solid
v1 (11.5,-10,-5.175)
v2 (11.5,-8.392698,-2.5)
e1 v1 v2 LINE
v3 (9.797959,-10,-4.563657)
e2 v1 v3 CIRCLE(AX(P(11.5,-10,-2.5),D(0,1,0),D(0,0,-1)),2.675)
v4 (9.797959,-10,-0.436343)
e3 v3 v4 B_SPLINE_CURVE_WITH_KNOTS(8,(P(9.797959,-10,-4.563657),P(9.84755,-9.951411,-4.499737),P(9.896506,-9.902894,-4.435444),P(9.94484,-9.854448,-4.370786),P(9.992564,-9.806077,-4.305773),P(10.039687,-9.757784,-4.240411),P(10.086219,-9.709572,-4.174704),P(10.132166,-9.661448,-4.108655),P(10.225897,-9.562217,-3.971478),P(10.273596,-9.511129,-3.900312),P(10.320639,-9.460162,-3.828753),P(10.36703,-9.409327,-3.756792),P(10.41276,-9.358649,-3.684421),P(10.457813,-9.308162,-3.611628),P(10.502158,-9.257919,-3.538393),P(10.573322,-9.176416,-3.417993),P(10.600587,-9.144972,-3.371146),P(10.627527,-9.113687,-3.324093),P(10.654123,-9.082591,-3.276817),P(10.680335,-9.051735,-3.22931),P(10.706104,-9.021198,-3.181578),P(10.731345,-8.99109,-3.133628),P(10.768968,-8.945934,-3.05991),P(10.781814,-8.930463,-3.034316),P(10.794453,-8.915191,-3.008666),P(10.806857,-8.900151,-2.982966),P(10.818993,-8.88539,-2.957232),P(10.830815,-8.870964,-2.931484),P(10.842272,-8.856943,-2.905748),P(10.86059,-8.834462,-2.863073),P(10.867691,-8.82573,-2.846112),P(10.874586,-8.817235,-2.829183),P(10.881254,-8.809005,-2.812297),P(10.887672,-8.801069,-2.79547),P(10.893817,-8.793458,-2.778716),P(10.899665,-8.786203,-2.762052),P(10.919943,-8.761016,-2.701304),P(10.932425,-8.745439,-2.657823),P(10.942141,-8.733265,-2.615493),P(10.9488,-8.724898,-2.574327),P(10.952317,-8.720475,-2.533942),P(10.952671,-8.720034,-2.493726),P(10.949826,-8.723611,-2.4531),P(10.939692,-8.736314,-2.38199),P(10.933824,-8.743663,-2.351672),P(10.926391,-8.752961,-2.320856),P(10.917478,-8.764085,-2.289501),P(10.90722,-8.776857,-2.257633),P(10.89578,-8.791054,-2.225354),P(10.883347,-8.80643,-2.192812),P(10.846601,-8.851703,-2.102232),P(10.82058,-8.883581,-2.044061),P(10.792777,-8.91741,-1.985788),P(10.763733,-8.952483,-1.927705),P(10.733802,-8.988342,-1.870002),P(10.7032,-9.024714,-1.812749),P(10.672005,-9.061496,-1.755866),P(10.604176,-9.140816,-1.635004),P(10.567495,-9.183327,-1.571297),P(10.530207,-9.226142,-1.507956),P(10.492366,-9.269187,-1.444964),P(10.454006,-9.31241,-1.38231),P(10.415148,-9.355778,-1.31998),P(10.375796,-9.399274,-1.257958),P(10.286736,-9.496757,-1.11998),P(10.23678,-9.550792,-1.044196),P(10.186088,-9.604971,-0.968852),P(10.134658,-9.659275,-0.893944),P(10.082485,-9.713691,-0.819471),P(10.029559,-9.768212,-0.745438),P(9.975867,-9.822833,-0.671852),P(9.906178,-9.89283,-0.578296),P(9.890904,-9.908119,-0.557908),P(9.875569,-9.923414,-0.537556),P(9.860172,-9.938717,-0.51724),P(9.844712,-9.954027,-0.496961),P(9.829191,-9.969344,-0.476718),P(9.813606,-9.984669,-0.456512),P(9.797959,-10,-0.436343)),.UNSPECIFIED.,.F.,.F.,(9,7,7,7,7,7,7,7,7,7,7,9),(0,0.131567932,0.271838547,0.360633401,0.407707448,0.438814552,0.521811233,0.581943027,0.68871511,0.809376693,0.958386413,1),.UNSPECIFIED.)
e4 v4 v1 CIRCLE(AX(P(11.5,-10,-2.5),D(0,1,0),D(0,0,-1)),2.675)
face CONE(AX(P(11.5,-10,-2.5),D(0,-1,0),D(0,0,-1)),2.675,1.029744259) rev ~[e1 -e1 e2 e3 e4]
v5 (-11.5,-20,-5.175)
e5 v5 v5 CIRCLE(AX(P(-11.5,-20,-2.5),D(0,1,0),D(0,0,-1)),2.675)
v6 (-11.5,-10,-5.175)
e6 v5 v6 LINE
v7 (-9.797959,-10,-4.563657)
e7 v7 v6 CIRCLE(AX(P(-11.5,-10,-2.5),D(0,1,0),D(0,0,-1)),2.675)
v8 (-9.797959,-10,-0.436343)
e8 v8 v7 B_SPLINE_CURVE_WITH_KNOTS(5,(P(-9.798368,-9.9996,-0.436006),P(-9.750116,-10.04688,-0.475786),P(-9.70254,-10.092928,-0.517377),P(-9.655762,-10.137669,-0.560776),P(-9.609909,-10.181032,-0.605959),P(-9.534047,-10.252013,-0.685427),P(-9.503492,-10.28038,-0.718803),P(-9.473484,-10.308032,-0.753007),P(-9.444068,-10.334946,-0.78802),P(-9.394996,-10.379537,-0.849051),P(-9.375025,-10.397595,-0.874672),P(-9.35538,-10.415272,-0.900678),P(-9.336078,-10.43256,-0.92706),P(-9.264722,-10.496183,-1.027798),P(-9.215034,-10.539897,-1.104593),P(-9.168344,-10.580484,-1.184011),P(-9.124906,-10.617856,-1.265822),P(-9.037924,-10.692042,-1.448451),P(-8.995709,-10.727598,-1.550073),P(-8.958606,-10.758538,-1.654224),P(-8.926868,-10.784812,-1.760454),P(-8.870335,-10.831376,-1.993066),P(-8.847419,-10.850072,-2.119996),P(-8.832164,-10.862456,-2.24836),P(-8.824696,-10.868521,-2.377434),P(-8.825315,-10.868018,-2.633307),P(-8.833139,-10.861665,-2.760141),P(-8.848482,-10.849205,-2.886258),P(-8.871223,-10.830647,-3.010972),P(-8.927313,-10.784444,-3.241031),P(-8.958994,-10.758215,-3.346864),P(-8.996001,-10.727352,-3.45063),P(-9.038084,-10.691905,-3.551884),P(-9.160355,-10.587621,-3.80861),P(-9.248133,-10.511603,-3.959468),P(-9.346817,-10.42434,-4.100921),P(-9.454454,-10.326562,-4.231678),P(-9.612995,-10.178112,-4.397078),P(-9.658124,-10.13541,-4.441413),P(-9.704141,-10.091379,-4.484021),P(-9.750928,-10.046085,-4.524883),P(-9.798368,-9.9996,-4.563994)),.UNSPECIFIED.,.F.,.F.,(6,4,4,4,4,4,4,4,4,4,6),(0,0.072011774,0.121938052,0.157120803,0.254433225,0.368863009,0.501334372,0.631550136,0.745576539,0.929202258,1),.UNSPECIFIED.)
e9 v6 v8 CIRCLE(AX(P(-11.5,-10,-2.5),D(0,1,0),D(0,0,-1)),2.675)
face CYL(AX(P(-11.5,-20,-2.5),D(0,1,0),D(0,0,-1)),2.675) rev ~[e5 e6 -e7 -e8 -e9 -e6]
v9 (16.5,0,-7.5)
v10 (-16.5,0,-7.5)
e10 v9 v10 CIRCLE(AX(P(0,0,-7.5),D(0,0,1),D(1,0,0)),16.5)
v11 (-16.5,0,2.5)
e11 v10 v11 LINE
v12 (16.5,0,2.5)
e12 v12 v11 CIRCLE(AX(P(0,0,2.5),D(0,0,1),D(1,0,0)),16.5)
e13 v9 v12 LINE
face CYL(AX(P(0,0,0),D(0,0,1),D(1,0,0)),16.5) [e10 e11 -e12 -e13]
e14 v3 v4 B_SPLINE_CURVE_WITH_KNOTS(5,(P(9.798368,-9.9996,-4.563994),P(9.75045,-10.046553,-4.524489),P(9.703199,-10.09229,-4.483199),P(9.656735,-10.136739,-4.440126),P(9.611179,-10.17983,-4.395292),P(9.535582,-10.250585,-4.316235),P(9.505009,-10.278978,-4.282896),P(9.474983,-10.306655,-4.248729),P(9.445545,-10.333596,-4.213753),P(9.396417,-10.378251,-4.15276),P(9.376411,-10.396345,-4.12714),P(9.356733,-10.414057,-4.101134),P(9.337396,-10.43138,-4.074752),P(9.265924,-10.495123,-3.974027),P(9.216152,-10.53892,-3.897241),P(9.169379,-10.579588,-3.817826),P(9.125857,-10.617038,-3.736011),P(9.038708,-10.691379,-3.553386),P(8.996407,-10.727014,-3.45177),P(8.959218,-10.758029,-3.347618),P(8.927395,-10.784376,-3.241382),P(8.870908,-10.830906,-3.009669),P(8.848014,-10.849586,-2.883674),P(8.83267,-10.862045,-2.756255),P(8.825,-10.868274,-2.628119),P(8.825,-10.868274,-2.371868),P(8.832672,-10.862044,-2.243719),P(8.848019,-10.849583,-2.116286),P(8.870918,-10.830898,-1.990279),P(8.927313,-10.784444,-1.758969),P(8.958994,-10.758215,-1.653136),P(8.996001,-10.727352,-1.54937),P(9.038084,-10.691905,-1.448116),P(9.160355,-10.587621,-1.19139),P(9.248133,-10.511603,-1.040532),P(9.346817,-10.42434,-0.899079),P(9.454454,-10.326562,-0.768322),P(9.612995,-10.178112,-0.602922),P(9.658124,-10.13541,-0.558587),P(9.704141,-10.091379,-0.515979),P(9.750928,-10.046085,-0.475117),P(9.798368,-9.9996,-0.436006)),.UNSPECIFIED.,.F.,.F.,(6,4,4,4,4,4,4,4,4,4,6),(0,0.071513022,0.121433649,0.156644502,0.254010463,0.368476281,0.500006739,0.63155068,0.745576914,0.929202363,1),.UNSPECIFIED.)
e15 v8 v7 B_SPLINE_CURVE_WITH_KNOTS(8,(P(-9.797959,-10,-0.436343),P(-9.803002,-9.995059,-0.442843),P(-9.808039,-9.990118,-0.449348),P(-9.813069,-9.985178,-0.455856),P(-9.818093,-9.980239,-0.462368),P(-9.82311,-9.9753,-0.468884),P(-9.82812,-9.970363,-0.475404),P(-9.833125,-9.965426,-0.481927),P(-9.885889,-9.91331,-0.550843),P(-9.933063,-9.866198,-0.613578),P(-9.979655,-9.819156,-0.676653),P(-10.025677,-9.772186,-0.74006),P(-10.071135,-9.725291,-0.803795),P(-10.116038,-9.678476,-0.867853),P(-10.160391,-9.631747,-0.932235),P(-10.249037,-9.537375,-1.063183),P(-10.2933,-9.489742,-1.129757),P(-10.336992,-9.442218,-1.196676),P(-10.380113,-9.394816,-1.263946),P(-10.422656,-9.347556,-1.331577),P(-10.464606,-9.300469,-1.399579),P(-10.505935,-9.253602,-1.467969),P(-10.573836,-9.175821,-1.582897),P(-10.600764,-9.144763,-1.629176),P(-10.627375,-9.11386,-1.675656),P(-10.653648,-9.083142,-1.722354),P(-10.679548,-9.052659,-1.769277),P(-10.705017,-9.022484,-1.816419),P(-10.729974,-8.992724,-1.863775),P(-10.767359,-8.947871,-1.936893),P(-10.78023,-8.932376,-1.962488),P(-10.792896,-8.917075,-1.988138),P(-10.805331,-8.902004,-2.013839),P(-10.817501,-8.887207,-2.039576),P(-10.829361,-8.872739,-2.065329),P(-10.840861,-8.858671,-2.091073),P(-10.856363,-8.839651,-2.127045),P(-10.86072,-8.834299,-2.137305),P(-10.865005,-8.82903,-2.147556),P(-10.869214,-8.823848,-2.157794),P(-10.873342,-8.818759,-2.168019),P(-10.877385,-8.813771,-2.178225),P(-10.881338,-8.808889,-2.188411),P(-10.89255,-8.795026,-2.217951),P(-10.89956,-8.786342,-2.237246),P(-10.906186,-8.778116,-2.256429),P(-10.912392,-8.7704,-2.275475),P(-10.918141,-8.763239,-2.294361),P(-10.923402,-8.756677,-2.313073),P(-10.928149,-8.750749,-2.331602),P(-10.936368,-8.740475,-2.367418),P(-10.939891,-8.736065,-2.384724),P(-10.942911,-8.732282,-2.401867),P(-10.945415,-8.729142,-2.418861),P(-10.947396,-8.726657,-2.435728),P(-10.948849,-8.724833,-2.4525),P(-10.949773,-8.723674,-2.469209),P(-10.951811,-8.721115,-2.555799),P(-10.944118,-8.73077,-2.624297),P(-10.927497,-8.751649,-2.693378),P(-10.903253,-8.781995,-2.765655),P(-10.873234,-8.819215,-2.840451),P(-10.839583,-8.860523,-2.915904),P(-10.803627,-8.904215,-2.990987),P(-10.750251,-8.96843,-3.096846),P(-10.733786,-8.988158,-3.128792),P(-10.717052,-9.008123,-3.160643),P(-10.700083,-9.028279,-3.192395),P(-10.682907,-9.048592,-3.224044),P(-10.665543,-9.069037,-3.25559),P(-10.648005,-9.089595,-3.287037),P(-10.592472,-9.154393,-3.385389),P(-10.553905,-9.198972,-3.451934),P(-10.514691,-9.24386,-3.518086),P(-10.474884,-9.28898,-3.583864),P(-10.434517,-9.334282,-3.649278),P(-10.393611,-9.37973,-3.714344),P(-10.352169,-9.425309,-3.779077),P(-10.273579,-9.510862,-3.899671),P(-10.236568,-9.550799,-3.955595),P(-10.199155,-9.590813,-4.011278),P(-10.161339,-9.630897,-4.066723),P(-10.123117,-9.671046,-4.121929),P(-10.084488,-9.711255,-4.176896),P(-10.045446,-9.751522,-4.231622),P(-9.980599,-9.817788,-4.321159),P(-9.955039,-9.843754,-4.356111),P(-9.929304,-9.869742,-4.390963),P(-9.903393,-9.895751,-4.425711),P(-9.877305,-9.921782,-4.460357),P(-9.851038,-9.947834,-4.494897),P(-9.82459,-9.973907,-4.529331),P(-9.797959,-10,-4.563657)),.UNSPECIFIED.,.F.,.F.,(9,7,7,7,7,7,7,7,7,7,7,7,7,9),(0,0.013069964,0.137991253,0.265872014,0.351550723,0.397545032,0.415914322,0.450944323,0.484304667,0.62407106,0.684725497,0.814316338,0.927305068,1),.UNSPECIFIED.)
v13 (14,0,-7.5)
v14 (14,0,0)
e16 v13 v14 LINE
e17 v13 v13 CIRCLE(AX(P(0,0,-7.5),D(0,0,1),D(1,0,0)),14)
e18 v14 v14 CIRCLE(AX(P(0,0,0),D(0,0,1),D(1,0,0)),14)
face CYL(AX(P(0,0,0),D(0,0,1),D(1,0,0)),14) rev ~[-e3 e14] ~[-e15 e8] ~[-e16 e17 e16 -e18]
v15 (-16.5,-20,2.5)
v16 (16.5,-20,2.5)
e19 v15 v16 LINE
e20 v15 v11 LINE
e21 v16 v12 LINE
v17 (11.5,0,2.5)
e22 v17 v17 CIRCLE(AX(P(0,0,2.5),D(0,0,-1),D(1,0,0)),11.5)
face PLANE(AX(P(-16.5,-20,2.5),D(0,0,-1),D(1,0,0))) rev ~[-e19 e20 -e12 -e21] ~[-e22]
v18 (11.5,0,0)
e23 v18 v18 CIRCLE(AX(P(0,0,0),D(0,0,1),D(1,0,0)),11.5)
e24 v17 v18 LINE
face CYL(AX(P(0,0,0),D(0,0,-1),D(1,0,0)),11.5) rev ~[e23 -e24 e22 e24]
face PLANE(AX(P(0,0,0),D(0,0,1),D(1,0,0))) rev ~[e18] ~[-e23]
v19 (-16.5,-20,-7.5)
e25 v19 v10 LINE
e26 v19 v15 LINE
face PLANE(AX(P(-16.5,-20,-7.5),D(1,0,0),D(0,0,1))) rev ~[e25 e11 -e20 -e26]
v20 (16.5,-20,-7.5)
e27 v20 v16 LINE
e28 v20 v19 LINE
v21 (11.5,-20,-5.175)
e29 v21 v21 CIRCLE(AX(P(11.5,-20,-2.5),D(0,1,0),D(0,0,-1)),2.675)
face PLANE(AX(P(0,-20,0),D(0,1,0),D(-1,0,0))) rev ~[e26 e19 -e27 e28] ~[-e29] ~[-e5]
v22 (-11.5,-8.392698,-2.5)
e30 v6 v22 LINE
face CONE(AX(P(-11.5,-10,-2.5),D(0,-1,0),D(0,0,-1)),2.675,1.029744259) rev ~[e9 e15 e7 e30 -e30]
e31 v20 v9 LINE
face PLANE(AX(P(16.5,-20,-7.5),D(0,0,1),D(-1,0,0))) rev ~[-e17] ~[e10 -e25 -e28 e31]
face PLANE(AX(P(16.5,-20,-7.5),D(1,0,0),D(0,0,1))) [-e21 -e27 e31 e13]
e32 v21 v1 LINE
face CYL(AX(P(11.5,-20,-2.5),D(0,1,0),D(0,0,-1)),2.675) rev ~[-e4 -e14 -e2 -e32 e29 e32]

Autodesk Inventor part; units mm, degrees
ref_plane "YZ Plane" through (0, 0, 0) normal (1, 0, 0) x (0, 1, 0)
ref_plane "XY Plane" through (0, 0, 0) normal (0, 0, 1) x (1, 0, 0)
sketch "Sketch1" plane through (0, 0, 0) normal (0, 0, 1) x (1, 0, 0)
  circle A0 centre (0, 0) radius 14
  circle A1 centre (0, 0) radius 16.5
  circle A2 centre (0, 0) radius 11.5
  dimension "d0" = 28
  dimension "d1" = 33
  dimension "d2" = 23
extrude "Extrusion1" add sketch "Sketch1" along normal blind 2.5 contours A0 | A1
extrude "Extrusion2" add sketch "Sketch1" against normal blind 7.5 contours A1
ref_plane "Work Plane1" through (0, -20, 0) normal (0, 1, 0) x (-1, 0, 0)
sketch "Sketch2" plane through (0, -20, 0) normal (0, 1, 0) x (-1, 0, 0)
  line L0 (-16.5, -7.5) -> (16.5, -7.5) projected
  line L1 (16.5, 2.5) -> (-16.5, 2.5) projected
  line L2 (16.5, -7.5) -> (16.5, 2.5) projected
  line L3 (-16.5, -7.5) -> (-16.5, 2.5) projected
  line L4 (-16.5, 2.5) -> (-26.5, 2.5)
  line L5 (-26.5, 2.5) -> (-26.5, -7.5)
  line L6 (-26.5, -7.5) -> (-16.5, -7.5)
  line L7 (-16.5, -7.5) -> (-16.5, 2.5)
  line L8 (16.5, 2.5) -> (26.5, 2.5)
  line L9 (26.5, 2.5) -> (26.5, -7.5)
  line L10 (26.5, -7.5) -> (16.5, -7.5)
  line L11 (16.5, -7.5) -> (16.5, 2.5)
  point P0 (0, 0)
  dimension "d8" = 10
  dimension "d9" = 10
  dimension "d10" = 10
  dimension "d11" = 10
extrude "Extrusion3" add sketch "Sketch2" along normal blind 20 contours L3 L1 L2 L0
delete faces "Delete Face1" heal yes whole lump no faces at (-3.8333, 0, -5)
extrude "Extrusion4" [suppressed]
sketch "Sketch3" plane through (0, -20, 0) normal (0, -1, 0) x (1, 0, 0)
  line L0 (-16.5, -7.5) -> (-16.5, 2.5) projected
  line L1 (16.5, 2.5) -> (16.5, -7.5) projected
  point P0 (0, 0)
  point P1 (-11.5, -2.5)
  point P2 (11.5, -2.5)
  point P3 (16.5, -2.5)
  point P4 (-16.5, -2.5)
  dimension "d23" = 5
  dimension "d24" = 5
hole "Hole1" at (-11.5, -20, -2.5) at (11.5, -20, -2.5) direction (0, 1, 0) diameter 5.35 depth 10 tip angle 118
properties part number "Adafruit_1528_4699_ND_House_02"
